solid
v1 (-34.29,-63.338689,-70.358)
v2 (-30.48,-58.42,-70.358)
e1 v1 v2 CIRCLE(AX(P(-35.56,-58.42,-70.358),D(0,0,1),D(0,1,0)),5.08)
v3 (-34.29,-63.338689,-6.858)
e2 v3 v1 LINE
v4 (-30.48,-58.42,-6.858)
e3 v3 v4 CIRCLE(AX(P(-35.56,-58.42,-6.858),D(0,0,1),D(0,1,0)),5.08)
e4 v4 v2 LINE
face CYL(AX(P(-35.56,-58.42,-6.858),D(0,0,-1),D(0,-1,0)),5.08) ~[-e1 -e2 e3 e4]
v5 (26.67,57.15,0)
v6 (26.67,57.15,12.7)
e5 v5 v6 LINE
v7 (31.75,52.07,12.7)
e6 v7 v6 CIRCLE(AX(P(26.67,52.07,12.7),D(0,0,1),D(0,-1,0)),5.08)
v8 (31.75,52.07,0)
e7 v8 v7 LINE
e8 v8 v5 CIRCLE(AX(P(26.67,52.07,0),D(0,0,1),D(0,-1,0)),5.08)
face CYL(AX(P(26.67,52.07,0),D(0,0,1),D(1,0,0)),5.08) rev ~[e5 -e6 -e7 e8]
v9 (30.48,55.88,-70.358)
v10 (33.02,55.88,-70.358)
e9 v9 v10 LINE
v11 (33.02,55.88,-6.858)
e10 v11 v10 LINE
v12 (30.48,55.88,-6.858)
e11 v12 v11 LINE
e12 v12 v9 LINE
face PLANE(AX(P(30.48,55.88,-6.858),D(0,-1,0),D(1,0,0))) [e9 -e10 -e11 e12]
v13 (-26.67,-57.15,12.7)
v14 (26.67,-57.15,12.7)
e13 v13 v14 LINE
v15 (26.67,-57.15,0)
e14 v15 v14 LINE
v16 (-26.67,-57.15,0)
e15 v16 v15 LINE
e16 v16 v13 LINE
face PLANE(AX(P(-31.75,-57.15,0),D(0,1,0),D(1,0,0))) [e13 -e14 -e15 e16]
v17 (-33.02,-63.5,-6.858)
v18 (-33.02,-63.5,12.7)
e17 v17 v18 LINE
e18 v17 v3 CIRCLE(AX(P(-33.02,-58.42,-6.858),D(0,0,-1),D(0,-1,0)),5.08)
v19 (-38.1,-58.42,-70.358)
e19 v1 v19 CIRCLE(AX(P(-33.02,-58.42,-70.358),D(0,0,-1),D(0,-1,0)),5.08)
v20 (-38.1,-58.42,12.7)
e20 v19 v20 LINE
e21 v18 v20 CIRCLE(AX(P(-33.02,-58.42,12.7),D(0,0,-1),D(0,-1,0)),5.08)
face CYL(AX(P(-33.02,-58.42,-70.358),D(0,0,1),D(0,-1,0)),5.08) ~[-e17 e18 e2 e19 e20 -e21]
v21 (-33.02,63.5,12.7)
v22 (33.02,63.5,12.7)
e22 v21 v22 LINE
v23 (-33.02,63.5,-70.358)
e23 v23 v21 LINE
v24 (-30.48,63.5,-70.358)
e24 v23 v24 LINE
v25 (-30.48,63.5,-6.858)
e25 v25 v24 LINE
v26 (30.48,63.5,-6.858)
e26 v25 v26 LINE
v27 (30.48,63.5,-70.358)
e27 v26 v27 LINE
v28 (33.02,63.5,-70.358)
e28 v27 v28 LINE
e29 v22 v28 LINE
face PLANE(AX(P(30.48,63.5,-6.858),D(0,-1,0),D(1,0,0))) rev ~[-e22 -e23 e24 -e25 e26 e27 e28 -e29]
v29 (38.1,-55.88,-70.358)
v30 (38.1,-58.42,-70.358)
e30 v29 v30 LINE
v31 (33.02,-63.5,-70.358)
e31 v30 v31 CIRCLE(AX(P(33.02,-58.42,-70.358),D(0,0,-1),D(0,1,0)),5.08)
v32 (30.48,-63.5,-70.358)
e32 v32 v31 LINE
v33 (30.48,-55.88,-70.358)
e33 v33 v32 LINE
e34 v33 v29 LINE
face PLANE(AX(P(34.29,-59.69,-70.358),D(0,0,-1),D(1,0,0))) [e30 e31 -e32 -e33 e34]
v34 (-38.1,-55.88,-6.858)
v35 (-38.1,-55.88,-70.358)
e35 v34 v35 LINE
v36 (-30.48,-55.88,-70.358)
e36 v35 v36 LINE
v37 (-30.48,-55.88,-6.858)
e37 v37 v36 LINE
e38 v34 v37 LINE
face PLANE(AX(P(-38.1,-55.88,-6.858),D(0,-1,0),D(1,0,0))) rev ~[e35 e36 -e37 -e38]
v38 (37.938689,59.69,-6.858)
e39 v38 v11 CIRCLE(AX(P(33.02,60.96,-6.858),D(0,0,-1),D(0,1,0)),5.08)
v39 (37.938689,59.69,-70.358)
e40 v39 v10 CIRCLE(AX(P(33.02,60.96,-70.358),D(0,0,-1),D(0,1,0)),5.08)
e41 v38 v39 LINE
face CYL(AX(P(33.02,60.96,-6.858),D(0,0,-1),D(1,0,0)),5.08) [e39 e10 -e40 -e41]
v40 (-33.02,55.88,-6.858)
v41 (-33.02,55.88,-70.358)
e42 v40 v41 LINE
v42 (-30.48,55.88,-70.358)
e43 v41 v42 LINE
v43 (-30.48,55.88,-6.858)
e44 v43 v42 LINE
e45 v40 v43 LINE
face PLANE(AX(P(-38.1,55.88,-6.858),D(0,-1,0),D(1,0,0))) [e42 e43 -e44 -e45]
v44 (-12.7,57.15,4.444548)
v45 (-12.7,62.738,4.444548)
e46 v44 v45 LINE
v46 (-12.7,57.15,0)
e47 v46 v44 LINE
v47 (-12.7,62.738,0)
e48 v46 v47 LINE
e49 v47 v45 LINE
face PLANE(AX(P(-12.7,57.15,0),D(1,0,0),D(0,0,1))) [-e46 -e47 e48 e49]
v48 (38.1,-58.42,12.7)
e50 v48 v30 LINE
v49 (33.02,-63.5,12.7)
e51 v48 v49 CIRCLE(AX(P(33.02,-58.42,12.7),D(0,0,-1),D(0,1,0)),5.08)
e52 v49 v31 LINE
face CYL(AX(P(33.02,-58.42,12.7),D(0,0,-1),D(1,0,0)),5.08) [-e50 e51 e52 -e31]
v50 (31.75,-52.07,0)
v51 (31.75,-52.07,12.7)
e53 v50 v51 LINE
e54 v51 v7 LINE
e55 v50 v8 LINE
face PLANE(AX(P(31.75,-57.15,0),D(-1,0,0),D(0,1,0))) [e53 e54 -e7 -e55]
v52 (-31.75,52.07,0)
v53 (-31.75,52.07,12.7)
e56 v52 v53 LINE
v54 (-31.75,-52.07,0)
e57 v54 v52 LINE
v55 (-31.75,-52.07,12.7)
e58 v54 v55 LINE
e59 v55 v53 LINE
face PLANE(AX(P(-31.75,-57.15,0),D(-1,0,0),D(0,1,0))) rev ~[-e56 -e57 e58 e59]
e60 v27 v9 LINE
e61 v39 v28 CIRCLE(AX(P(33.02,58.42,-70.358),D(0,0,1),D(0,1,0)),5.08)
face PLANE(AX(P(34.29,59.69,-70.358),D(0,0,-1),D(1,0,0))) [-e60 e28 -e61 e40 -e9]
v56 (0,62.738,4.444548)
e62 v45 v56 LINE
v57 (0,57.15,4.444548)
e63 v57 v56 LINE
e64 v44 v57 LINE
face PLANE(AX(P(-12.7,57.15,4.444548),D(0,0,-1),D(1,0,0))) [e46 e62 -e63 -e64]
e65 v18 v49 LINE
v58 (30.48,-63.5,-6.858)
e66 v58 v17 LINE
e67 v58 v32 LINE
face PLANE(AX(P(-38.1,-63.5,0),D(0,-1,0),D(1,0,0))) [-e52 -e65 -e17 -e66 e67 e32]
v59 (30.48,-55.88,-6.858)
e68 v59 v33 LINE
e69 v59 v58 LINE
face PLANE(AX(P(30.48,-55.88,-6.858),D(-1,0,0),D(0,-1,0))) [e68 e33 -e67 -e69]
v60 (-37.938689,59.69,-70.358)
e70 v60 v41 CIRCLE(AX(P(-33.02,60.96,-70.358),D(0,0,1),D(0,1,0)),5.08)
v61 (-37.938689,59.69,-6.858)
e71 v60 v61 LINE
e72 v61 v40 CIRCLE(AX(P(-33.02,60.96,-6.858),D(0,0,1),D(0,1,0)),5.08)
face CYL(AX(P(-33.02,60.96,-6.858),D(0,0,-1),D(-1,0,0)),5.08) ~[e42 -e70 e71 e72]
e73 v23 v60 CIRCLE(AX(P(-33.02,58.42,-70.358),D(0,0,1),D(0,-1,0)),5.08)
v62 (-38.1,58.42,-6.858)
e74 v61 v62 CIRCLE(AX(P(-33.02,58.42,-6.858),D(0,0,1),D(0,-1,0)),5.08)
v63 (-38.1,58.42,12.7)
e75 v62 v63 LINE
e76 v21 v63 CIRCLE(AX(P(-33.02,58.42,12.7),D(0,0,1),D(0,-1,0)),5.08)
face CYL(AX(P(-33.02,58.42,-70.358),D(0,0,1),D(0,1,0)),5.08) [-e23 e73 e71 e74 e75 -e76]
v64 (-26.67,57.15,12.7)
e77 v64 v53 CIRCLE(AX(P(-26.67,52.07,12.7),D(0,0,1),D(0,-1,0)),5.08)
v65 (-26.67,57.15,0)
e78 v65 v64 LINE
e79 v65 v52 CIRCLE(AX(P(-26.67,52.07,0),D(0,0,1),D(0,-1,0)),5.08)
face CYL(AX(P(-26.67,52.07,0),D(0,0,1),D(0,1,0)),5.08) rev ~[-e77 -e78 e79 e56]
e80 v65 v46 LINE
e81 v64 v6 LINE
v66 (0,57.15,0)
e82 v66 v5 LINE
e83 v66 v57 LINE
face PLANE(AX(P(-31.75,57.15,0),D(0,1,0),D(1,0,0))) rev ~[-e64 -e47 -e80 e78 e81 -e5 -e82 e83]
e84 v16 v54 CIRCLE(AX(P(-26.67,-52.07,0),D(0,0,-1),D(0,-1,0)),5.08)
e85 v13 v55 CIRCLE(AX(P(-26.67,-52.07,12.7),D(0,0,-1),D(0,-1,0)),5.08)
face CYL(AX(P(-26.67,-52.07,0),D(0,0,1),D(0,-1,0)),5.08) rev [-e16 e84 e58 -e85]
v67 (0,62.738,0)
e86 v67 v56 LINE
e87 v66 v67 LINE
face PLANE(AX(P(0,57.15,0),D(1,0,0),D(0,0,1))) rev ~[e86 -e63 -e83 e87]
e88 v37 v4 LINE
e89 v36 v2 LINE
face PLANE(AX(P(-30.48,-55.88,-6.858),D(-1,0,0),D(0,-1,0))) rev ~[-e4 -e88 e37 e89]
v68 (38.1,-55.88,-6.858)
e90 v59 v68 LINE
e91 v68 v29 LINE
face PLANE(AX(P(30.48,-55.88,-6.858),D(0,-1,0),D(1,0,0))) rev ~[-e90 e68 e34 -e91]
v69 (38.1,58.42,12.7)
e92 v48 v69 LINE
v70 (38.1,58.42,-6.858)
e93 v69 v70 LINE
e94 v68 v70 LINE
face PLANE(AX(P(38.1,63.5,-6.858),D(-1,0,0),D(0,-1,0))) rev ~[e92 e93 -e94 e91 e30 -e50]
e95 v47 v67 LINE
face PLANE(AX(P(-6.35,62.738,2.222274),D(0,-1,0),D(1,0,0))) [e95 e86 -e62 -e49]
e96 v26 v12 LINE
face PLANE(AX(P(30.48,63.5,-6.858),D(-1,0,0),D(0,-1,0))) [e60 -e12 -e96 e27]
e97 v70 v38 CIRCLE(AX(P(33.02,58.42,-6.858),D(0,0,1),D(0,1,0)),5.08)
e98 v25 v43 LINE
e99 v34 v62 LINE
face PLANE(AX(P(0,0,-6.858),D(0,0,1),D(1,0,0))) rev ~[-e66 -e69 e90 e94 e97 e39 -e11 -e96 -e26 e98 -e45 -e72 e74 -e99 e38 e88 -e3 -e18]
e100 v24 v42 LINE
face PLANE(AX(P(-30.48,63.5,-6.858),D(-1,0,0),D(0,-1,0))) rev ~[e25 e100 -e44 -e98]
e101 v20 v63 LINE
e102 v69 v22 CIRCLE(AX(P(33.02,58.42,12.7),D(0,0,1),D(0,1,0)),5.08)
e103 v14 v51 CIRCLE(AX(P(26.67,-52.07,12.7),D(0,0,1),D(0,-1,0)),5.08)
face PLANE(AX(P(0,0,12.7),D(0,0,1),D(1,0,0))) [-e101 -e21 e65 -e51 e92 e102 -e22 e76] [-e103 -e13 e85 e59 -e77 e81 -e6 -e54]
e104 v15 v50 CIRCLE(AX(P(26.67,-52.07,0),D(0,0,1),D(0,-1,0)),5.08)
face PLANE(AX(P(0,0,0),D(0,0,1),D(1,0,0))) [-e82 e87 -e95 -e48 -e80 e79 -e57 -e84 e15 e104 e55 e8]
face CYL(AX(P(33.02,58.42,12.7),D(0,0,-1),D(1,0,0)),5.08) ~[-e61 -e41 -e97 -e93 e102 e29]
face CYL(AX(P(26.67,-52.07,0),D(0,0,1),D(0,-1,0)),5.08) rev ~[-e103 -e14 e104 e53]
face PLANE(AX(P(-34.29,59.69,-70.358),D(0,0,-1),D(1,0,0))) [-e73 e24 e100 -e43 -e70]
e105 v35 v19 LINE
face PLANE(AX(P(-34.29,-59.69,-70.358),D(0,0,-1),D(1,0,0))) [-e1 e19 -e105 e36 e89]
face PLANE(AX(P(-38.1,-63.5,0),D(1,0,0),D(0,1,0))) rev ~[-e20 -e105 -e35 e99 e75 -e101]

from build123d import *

# Parameters (mm, degrees)
F0_W     = 76.2
F0_H     = 127
F0_W_2   = 63.5
F0_H_2   = 114.3
F1_DEPTH = 12.7
F2_W     = 76.2
F2_H     = 127
F3_DEPTH = 6.858
F4_W     = 7.62
F4_H     = 7.62
F5_DEPTH = 63.5
F6_F1_R  = 5.08
F6_F2_R  = 5.08
F6_F3_R  = 5.08
F6_F4_R  = 5.08
F6_F5_R  = 5.08
F6_F6_R  = 5.08
F6_F7_R  = 5.08
F7_R     = 5.08
F8_W     = 12.7
F8_H     = 4.4445483945
F9_DEPTH = 5.588


with BuildPart() as f1:
    # F0 (on Top) → F1 (new body)
    with BuildSketch(Plane.XY):
        Rectangle(F0_W, F0_H)
        Rectangle(F0_W_2, F0_H_2, mode=Mode.SUBTRACT)
    extrude(amount=F1_DEPTH)

    # F2 (on Top) → F3 (join)
    with BuildSketch(Plane.XY):
        Rectangle(F2_W, F2_H)
    extrude(amount=-F3_DEPTH)

    # F4 (on face) → F5 (join)
    with BuildSketch(Plane(origin=(0, 0, -6.858), x_dir=(1, 0, 0), z_dir=(0, 0, -1))):
        with Locations((34.29, -59.69)):
            Rectangle(F4_W, F4_H)
        with Locations((34.29, 59.69)):
            Rectangle(F4_W, F4_H)
        with Locations((-34.29, 59.69)):
            Rectangle(F4_W, F4_H)
        with Locations((-34.29, -59.69)):
            Rectangle(F4_W, F4_H)
    extrude(amount=F5_DEPTH)

    # F6: fillet of radius 5.08 on 7 edges, made by hand

    # F6_f1
    f6_f1_edges = [f1.edges().sort_by_distance(p)[0] for p in [
        (38.1, 55.88, -38.608),
    ]]
    fillet(f6_f1_edges, radius=F6_F1_R)

    # F6_f2
    f6_f2_edges = [f1.edges().sort_by_distance(p)[0] for p in [
        (-38.1, 55.88, -38.608),
    ]]
    fillet(f6_f2_edges, radius=F6_F2_R)

    # F6_f3
    f6_f3_edges = [f1.edges().sort_by_distance(p)[0] for p in [
        (-30.48, -63.5, -38.608),
    ]]
    fillet(f6_f3_edges, radius=F6_F3_R)

    # F6_f4
    f6_f4_edges = [f1.edges().sort_by_distance(p)[0] for p in [
        (38.1, -63.5, -28.829),
    ]]
    fillet(f6_f4_edges, radius=F6_F4_R)

    # F6_f5
    f6_f5_edges = [f1.edges().sort_by_distance(p)[0] for p in [
        (-38.1, -63.5, -28.829),
    ]]
    fillet(f6_f5_edges, radius=F6_F5_R)

    # F6_f6
    f6_f6_edges = [f1.edges().sort_by_distance(p)[0] for p in [
        (38.1, 63.5, -28.829),
    ]]
    fillet(f6_f6_edges, radius=F6_F6_R)

    # F6_f7
    f6_f7_edges = [f1.edges().sort_by_distance(p)[0] for p in [
        (-38.1, 63.5, -28.829),
    ]]
    fillet(f6_f7_edges, radius=F6_F7_R)

    # F7
    f7_edges = [f1.edges().sort_by_distance(p)[0] for p in [
        (-31.75, -57.15, 6.35),
        (31.75, -57.15, 6.35),
        (-31.75, 57.15, 6.35),
        (31.75, 57.15, 6.35),
    ]]
    fillet(f7_edges, radius=F7_R)

    # F8 (on face) → F9 (cut)
    with BuildSketch(Plane.XZ.offset(-57.15)):
        with Locations((-6.35, 2.2222741973)):
            Rectangle(F8_W, F8_H)
    extrude(amount=-F9_DEPTH, mode=Mode.SUBTRACT)


solid = f1.part
